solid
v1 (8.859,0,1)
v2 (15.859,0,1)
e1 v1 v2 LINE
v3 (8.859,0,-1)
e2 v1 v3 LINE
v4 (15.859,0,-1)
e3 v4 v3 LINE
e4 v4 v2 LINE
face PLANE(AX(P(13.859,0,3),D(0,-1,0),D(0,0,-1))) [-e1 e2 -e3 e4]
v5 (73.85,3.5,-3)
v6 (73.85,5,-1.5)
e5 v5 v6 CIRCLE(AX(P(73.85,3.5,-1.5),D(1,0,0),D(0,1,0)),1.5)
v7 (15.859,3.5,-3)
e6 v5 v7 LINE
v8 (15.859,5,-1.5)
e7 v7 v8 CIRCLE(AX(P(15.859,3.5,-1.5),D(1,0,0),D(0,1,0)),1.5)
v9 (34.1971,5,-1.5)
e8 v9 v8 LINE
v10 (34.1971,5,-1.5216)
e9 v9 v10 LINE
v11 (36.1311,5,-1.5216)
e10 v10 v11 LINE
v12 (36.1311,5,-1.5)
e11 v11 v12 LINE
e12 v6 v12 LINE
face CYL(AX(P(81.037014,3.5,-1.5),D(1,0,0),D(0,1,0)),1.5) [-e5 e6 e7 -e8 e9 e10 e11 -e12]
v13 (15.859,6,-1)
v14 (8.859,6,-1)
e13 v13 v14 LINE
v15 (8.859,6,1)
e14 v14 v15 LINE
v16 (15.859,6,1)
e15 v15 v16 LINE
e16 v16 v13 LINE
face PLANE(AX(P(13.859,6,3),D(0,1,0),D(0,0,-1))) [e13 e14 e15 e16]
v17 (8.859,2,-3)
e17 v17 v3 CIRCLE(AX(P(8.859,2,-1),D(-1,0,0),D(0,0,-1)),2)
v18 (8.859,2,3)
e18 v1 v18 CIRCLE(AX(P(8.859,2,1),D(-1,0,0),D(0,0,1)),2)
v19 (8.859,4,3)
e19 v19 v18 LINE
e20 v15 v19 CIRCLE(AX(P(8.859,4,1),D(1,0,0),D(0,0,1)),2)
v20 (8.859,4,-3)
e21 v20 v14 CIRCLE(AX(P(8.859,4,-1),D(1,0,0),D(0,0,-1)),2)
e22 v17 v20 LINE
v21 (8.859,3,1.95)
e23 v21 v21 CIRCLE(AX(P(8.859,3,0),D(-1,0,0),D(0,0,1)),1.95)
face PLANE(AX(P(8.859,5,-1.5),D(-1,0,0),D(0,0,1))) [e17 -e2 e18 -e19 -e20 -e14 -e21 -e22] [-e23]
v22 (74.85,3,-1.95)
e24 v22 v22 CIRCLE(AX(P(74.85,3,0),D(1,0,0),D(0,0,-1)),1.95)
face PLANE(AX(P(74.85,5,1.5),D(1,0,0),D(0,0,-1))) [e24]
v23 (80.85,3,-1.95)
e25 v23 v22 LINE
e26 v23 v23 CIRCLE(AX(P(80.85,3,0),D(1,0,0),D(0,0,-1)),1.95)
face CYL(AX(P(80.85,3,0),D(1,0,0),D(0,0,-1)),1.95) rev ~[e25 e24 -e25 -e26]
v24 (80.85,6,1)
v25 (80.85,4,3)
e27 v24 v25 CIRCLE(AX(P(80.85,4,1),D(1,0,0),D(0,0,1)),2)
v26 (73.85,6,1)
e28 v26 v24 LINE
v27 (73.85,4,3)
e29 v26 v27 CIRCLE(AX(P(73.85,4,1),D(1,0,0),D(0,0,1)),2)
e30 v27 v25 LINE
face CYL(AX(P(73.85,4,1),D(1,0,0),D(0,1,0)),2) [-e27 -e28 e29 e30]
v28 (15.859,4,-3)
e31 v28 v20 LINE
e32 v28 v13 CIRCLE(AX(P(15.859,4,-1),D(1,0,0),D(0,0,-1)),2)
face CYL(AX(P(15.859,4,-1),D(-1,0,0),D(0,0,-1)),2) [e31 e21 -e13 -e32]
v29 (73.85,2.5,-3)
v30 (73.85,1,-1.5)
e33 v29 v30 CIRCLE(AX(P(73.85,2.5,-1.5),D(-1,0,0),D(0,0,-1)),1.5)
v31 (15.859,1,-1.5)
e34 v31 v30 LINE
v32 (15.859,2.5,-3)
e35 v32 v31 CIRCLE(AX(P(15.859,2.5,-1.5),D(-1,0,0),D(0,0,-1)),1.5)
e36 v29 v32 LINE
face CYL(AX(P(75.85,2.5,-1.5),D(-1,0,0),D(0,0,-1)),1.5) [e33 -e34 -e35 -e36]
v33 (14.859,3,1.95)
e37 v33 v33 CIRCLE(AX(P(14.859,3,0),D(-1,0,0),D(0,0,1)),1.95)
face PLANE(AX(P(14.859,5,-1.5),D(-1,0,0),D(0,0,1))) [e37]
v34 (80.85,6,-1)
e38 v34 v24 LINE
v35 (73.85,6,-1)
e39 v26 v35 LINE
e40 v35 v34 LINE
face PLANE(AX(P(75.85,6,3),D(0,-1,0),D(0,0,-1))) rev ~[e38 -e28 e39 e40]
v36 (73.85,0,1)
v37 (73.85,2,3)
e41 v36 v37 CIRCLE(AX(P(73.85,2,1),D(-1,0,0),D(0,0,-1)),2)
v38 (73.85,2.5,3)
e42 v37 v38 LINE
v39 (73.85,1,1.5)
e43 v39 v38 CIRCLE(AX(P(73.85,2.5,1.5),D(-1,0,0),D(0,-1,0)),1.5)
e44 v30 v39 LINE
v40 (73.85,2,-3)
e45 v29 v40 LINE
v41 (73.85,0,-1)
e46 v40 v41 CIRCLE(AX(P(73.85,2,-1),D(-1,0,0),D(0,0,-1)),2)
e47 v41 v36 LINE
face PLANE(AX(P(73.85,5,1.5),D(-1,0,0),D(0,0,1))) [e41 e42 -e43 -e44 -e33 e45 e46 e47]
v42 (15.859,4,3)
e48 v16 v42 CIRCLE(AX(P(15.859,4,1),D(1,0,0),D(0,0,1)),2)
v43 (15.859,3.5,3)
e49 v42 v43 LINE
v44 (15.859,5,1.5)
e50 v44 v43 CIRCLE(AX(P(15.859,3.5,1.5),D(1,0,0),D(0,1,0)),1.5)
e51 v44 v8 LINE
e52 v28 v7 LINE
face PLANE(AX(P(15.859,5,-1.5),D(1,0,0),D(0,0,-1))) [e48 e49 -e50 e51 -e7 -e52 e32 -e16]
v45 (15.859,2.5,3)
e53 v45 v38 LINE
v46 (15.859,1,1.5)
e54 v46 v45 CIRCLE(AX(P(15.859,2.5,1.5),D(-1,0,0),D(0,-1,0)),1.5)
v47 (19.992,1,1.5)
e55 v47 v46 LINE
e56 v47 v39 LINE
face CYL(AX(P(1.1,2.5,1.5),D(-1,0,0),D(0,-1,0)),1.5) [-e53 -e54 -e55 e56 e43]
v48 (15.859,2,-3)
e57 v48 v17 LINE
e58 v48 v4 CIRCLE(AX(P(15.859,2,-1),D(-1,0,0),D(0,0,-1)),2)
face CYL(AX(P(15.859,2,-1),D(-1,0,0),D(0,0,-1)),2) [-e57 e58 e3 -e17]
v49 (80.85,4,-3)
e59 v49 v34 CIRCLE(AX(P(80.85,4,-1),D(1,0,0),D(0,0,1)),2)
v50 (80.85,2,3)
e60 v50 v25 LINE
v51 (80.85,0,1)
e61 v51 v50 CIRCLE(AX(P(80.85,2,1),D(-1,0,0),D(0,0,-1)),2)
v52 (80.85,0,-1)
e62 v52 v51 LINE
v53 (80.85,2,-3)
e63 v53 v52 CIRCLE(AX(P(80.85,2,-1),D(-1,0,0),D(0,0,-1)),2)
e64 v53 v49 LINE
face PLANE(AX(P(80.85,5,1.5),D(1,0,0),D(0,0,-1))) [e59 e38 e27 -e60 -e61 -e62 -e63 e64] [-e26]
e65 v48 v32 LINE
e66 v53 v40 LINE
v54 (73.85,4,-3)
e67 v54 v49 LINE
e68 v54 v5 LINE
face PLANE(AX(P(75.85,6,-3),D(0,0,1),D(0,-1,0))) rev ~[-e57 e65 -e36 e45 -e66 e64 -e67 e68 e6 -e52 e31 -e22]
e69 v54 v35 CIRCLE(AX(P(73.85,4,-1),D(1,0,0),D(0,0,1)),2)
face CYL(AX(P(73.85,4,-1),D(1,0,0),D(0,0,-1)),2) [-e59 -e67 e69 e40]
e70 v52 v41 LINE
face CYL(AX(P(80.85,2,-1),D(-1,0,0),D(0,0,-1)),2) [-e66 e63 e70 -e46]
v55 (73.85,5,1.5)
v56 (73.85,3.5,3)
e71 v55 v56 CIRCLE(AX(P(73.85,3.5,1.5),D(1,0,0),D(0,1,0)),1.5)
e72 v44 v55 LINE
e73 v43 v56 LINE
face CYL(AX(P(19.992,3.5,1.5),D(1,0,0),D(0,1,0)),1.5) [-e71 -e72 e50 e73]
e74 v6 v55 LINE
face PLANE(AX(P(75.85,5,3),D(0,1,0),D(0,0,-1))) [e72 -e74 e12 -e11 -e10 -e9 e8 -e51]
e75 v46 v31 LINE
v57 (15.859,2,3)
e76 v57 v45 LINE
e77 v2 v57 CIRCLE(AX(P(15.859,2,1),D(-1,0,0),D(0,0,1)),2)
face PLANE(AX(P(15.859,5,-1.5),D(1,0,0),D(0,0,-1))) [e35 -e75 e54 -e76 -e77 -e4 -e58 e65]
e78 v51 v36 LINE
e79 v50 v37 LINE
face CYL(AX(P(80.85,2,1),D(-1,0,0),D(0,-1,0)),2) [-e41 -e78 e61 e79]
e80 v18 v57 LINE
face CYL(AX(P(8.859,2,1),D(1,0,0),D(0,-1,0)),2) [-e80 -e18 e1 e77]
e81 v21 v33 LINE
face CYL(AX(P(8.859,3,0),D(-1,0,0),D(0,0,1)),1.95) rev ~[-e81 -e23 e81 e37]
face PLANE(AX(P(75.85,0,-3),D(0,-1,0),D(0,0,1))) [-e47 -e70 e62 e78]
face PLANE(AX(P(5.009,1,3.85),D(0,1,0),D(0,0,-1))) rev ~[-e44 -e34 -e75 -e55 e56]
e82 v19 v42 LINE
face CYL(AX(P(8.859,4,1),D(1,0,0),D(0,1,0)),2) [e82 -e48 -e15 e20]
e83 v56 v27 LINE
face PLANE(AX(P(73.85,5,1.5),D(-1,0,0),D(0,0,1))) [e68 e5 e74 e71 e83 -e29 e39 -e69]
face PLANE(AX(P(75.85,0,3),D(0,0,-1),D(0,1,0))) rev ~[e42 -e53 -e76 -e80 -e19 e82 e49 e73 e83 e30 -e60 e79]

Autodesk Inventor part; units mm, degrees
ref_plane "YZ Plane" through (0, 0, 0) normal (1, 0, 0) x (0, 1, 0)
ref_plane "XZ Plane" through (0, 0, 0) normal (0, 1, 0) x (-1, 0, 0)
ref_plane "XY Plane" through (0, 0, 0) normal (0, 0, 1) x (1, 0, 0)
sketch "Sketch1" plane through (0, 0, 0) normal (0, 1, 0) x (-1, 0, 0)
  point P0 (0, 0)
sketch "Sketch2" plane through (0, 0, 0) normal (0, 1, 0) x (-1, 0, 0)
  circle A0 centre (0, 0) radius 3.85
  dimension "d0" = 7.7
extrude "Extrusion1" add sketch "Sketch2" along normal blind 6
sketch "Sketch3" plane through (0, 6, 0) normal (0, 1, 0) x (1, 0, 0)
  circle A0 centre (0, 0) radius 1
  dimension "d3" = 2
extrude "Extrusion2" cut sketch "Sketch3" against normal through all
sketch "Sketch4" plane through (0, 0, 0) normal (0, -1, 0) x (1, 0, 0)
  circle A0 centre (0, 0) radius 3.85 projected
  line L0 (0, 3.85) -> (3.85, 3.85)
  line L1 (3.85, 3.85) -> (3.85, -3.85)
  line L2 (3.85, -3.85) -> (0, -3.85)
  line L3 (3.85, 3.85) -> (4.85, 3.85)
  line L4 (4.85, 3.85) -> (4.85, -3.85)
  line L5 (4.85, -3.85) -> (3.85, -3.85)
  line L6 (3.85, -3.85) -> (3.85, 3.85)
  line L7 (4.85, 3.85) -> (4.85, 3)
  line L8 (4.85, -3.85) -> (4.85, -3)
  line L9 (4.85, 3) -> (3.85, 3)
  line L10 (3.85, 3) -> (3.85, -3)
  line L11 (3.85, -3) -> (4.85, -3)
  line L12 (4.85, -3) -> (4.85, 3)
  point P0 (3.85, -3)
  dimension "d6" = 1
  dimension "d7" = 0.85
  dimension "d8" = 0.85
extrude "Extrusion3" add sketch "Sketch4" against normal blind 6 contours L1 L9 L4 L11
sketch "Sketch5" plane through (4.85, 0, 3) normal (1, 0, 0) x (0, 0, -1)
  line L0 (6.85, 0) -> (-0.85, 0) projected
  line L1 (6, 0) -> (6, 6) projected
  line L2 (0.0003, 0) -> (6, 0)
  line L3 (6, 0) -> (6, 1)
  line L4 (6, 1) -> (0.0003, 1)
  line L5 (0.0003, 1) -> (0.0003, 0)
  line L6 (6.85, 6) -> (-0.85, 6) projected
  line L7 (0.0003, 6) -> (6, 6)
  line L8 (6, 6) -> (6, 5)
  line L9 (6, 5) -> (0.0003, 5)
  line L10 (0.0003, 5) -> (0.0003, 6)
  point P0 (3, 0)
  point P1 (3, 6)
  dimension "d11" = 1
  dimension "d12" = 1
extrude "Extrusion4" cut sketch "Sketch5" against normal blind 1 contours L9 L10 L6 L1
extrude "Extrusion5" cut sketch "Sketch5" against normal blind 1 contours L0 L5 L4 L1
sketch "Sketch6" plane through (4.85, 5, 2.9997) normal (0, 0, -1) x (-1, 0, 0)
  line L0 (0, 0) -> (1, 0) projected
  line L1 (0, -5) -> (0, 1) projected
  line L2 (1, 0) -> (0, 0)
  line L3 (0, 0) -> (0, 1)
  line L4 (0, 1) -> (1, 1)
  line L5 (1, 1) -> (1, 0)
  line L6 (1, -5) -> (0, -5)
  line L7 (0, -5) -> (0, -3.9916)
  line L8 (0, -3.9916) -> (1, -3.9916)
  line L9 (1, -3.9916) -> (1, -5)
  point P0 (4.85, -5)
extrude "Extrusion6" cut sketch "Sketch6" against normal through all contours L1 L4 L5 L0
extrude "Extrusion7" cut sketch "Sketch6" against normal through all contours L1 L8 L9 L6
sketch "Sketch7" plane through (4.85, 5, 3) normal (1, 0, 0) x (0, 0, -1)
  line L0 (0, 0) -> (3, 0) projected
  line L1 (6, -4) -> (6, 0) projected
  line L2 (0, 0) -> (6, 0)
  line L3 (6, 0) -> (6, -4)
  line L4 (6, -4) -> (0, -4)
  line L5 (0, -4) -> (0, 0)
  point P0 (3, -5)
extrude "Extrusion8" add sketch "Sketch7" along normal blind 71
sketch "Sketch8" plane through (3.85, 1, -3) normal (0, 0, -1) x (-1, 0, 0)
  point P0 (3.85, -1)
sketch "Sketch9" plane through (3.85, 5, 0) normal (0, 1, 0) x (1, 0, 0)
  line L0 (72, 3) -> (72, -3) projected
  line L1 (72, 0) -> (75.85, 0)
  circle A0 centre (75.85, 0) radius 3.85
  point P0 (-3.85, 0)
  dimension "d23" = 3.85
extrude "Extrusion9" add sketch "Sketch9" along normal blind 1
extrude "Extrusion10" add sketch "Sketch9" against normal blind 5
sketch "Sketch10" plane through (79.7, 6, 0) normal (0, 1, 0) x (1, 0, 0)
  circle A0 centre (0, 0) radius 1.85
  point P0 (-79.7, 0)
  dimension "d28" = 3.7
extrude "Extrusion11" cut sketch "Sketch10" against normal through all
sketch "Sketch11" plane through (3.85, 5, 0) normal (-1, 0, 0) x (0, 0, 1)
  point P0 (0, -5)
sketch "Sketch12" plane through (3.85, 5, -3) normal (-1, 0, 0) x (0, 0, 1)
  line L0 (0, 0) -> (3, 0) projected
  line L1 (6, 0) -> (6, -4) projected
  line L2 (0, 0) -> (6, 0)
  line L3 (6, 0) -> (6, -4)
  line L4 (6, -4) -> (0, -4)
  line L5 (0, -4) -> (0, 0)
  point P0 (3, -5)
extrude "Extrusion12" add sketch "Sketch12" along normal blind 2
sketch "Sketch13" plane through (75.85, 5, 3) normal (1, 0, 0) x (0, 0, -1)
  line L0 (3, 0) -> (0, 0) projected
  line L1 (3, -4) -> (6, -4) projected
  line L2 (0, 0) -> (6, 0)
  line L3 (6, 0) -> (6, -4)
  line L4 (6, -4) -> (0, -4)
  line L5 (0, -4) -> (0, 0)
  point P0 (3, -5)
extrude "Extrusion13" add sketch "Sketch13" along normal blind 1.6
fillet "Fillet1" radius 1.5 2 edges at (76.5685, 5, 3) (39.1315, 5, 3)
fillet "Fillet2" radius 1.5 1 edges at (39.85, 5, -3)
fillet "Fillet3" radius 1.5 1 edges at (39.85, 1, -3)
fillet "Fillet4" radius 1.5 3 edges at (4.35, 1, 2.9997) (40.35, 1, 3) (4.85, 1, 2.9998)
sketch "Sketch14" plane through (3.5458, 5, 1.5) normal (0, 1, 0) x (1, 0, 0)
  point P0 (-3.5458, 1.5)
sketch "Sketch15" plane through (3.5458, 5, 1.5) normal (0, 1, 0) x (1, 0, 0)
  line L0 (0.4177, 2.9988) -> (2.9717, 2.9988) construction
  line L1 (2.9717, 2.9988) -> (2.9717, -0.0492) construction
  line L2 (2.9717, -0.0492) -> (0.4177, -0.0492) construction
  line L3 (0.4177, -0.0492) -> (0.4177, 2.9988) construction
  line L4 (0.398, -0.0492) -> (1.4255, 2.9988)
  line L5 (1.4255, 2.9988) -> (1.9244, 2.9988)
  line L6 (1.9244, 2.9988) -> (2.952, -0.0492)
  line L7 (2.952, -0.0492) -> (2.5247, -0.0492)
  line L8 (2.5247, -0.0492) -> (2.248, 0.803)
  line L9 (2.248, 0.803) -> (1.0846, 0.803)
  line L10 (1.0846, 0.803) -> (0.808, -0.0492)
  line L11 (0.808, -0.0492) -> (0.398, -0.0492)
  line L12 (2.1369, 1.1488) -> (1.6651, 2.5839)
  line L13 (1.6651, 2.5839) -> (1.1958, 1.1488)
  line L14 (1.1958, 1.1488) -> (2.1369, 1.1488)
  point P0 (-3.5458, 1.5)
extrude "Extrusion14" add sketch "Sketch15" along normal blind 0.2
sketch "Sketch16" plane through (3.5458, 5, -1.5) normal (0, 1, 0) x (1, 0, 0)
  line L0 (69.8363, -0.0038) -> (72.3064, -0.0038) construction
  line L1 (72.3064, -0.0038) -> (72.3064, -3.0518) construction
  line L2 (72.3064, -3.0518) -> (69.8363, -3.0518) construction
  line L3 (69.8363, -3.0518) -> (69.8363, -0.0038) construction
  spline S0 degree 2 poles (72.2125, -2.1157) (72.2125, -2.3429) (72.0396, -2.6912) (71.8963, -2.8048) knots 0 0 0 1 2 2 2
  spline S1 degree 2 poles (71.8963, -2.8048) (71.7234, -2.9382) (71.3307, -3.0518) (71.0195, -3.0518) knots 0 0 0 1 2 2 2
  line L4 (71.0195, -3.0518) -> (70.1451, -3.0518)
  line L5 (70.1451, -3.0518) -> (70.1451, -0.0038)
  line L6 (70.1451, -0.0038) -> (70.9528, -0.0038)
  spline S2 degree 2 poles (70.9528, -0.0038) (71.2788, -0.0038) (71.6049, -0.0458) (71.7531, -0.1273) knots 0 0 0 1 2 2 2
  spline S3 degree 2 poles (71.7531, -0.1273) (71.9186, -0.2138) (72.0692, -0.4978) (72.0692, -0.6905) knots 0 0 0 1 2 2 2
  spline S4 degree 2 poles (72.0692, -0.6905) (72.0692, -0.9054) (71.842, -1.2462) (71.6419, -1.3426) knots 0 0 0 1 2 2 2
  line L7 (71.6419, -1.3426) -> (71.6419, -1.3574)
  spline S5 degree 2 poles (71.6419, -1.3574) (71.9136, -1.4315) (72.2125, -1.8242) (72.2125, -2.1157) knots 0 0 0 1 2 2 2
  spline S6 degree 2 poles (71.7901, -2.133) (71.7901, -1.9601) (71.6913, -1.7378) (71.5431, -1.6587) knots 0 0 0 1 2 2 2
  spline S7 degree 2 poles (71.5431, -1.6587) (71.4468, -1.6093) (71.2195, -1.5797) (71.0096, -1.5797) knots 0 0 0 1 2 2 2
  line L8 (71.0096, -1.5797) -> (70.5502, -1.5797)
  line L9 (70.5502, -1.5797) -> (70.5502, -2.706)
  line L10 (70.5502, -2.706) -> (70.8787, -2.706)
  spline S8 degree 2 poles (70.8787, -2.706) (71.1454, -2.706) (71.4517, -2.6566) (71.5703, -2.5776) knots 0 0 0 1 2 2 2
  spline S9 degree 2 poles (71.5703, -2.5776) (71.6839, -2.4961) (71.7901, -2.2935) (71.7901, -2.133) knots 0 0 0 1 2 2 2
  spline S10 degree 2 poles (71.6469, -0.7473) (71.6469, -0.6386) (71.5728, -0.4756) (71.4912, -0.4287) knots 0 0 0 1 2 2 2
  spline S11 degree 2 poles (71.4912, -0.4287) (71.3924, -0.3743) (71.1529, -0.3496) (70.938, -0.3496) knots 0 0 0 1 2 2 2
  line L11 (70.938, -0.3496) -> (70.5502, -0.3496)
  line L12 (70.5502, -0.3496) -> (70.5502, -1.2413)
  line L13 (70.5502, -1.2413) -> (71.0096, -1.2413)
  spline S12 degree 2 poles (71.0096, -1.2413) (71.1998, -1.2413) (71.3801, -1.2018) (71.4764, -1.14) knots 0 0 0 1 2 2 2
  spline S13 degree 2 poles (71.4764, -1.14) (71.5703, -1.0807) (71.6469, -0.8905) (71.6469, -0.7473) knots 0 0 0 1 2 2 2
  point P0 (-3.5458, -1.5)
extrude "Extrusion15" add sketch "Sketch16" along normal blind 0.2
sketch "Sketch17" plane through (3.5458, 5, -1.5) normal (0, 1, 0) x (1, 0, 0)
  line L0 (0.4145, -1.5) -> (36.4145, -1.5)
  line L1 (30.4487, 0.0859) -> (55.6072, 0.0859) construction
  line L2 (55.6072, 0.0859) -> (55.6072, -2.5363) construction
  line L3 (55.6072, -2.5363) -> (30.4487, -2.5363) construction
  line L4 (30.4487, -2.5363) -> (30.4487, 0.0859) construction
  line L5 (32.5853, -0.4353) -> (31.2663, -3.0264)
  line L6 (31.2663, -3.0264) -> (30.8316, -3.0264)
  line L7 (30.8316, -3.0264) -> (32.2247, -0.3365)
  line L8 (32.2247, -0.3365) -> (30.6513, -0.3365)
  line L9 (30.6513, -0.3365) -> (30.6513, 0.0216)
  line L10 (30.6513, 0.0216) -> (32.5853, 0.0216)
  line L11 (32.5853, 0.0216) -> (32.5853, -0.4353)
  line L12 (34.838, -3.0264) -> (32.9583, -3.0264)
  line L13 (32.9583, -3.0264) -> (32.9583, -2.5941)
  spline S0 degree 2 poles (32.9583, -2.5941) (33.1608, -2.4039) (33.5214, -2.0507) (33.6943, -1.8605) knots 0 0 0 1 2 2 2
  spline S1 degree 2 poles (33.6943, -1.8605) (34.0426, -1.4777) (34.297, -1.0182) (34.297, -0.7737) knots 0 0 0 1 2 2 2
  spline S2 degree 2 poles (34.297, -0.7737) (34.297, -0.6453) (34.218, -0.4526) (34.1464, -0.3909) knots 0 0 0 1 2 2 2
  spline S3 degree 2 poles (34.1464, -0.3909) (34.0747, -0.3291) (33.887, -0.2674) (33.7734, -0.2674) knots 0 0 0 1 2 2 2
  spline S4 degree 2 poles (33.7734, -0.2674) (33.6647, -0.2674) (33.4424, -0.3217) (33.3411, -0.3637) knots 0 0 0 1 2 2 2
  spline S5 degree 2 poles (33.3411, -0.3637) (33.2547, -0.3983) (33.0941, -0.4971) (33.0447, -0.5317) knots 0 0 0 1 2 2 2
  line L14 (33.0447, -0.5317) -> (33.0225, -0.5317)
  line L15 (33.0225, -0.5317) -> (33.0225, -0.0969)
  spline S6 degree 2 poles (33.0225, -0.0969) (33.1485, -0.0352) (33.6005, 0.0859) (33.803, 0.0859) knots 0 0 0 1 2 2 2
  spline S7 degree 2 poles (33.803, 0.0859) (34.2303, 0.0859) (34.712, -0.3662) (34.712, -0.7515) knots 0 0 0 1 2 2 2
  spline S8 degree 2 poles (34.712, -0.7515) (34.712, -0.9318) (34.628, -1.2331) (34.5539, -1.3616) knots 0 0 0 1 2 2 2
  spline S9 degree 2 poles (34.5539, -1.3616) (34.4798, -1.495) (34.2649, -1.7568) (34.1464, -1.8828) knots 0 0 0 1 2 2 2
  spline S10 degree 2 poles (34.1464, -1.8828) (33.9537, -2.0927) (33.4819, -2.5422) (33.3411, -2.6732) knots 0 0 0 1 2 2 2
  line L16 (33.3411, -2.6732) -> (34.838, -2.6732)
  line L17 (34.838, -2.6732) -> (34.838, -3.0264)
  line L18 (37.8958, -3.0264) -> (37.8958, -1.7024)
  spline S11 degree 2 poles (37.8958, -1.7024) (37.8958, -1.5444) (37.8711, -1.2751) (37.8316, -1.201) knots 0 0 0 1 2 2 2
  spline S12 degree 2 poles (37.8316, -1.201) (37.7921, -1.1195) (37.6414, -1.0405) (37.5105, -1.0405) knots 0 0 0 1 2 2 2
  spline S13 degree 2 poles (37.5105, -1.0405) (37.392, -1.0405) (37.1203, -1.1862) (36.977, -1.3245) knots 0 0 0 1 2 2 2
  spline S14 degree 2 poles (36.977, -1.3245) (36.9795, -1.3591) (36.9844, -1.4554) (36.9844, -1.5197) knots 0 0 0 1 2 2 2
  line L19 (36.9844, -1.5197) -> (36.9844, -3.0264)
  line L20 (36.9844, -3.0264) -> (36.5991, -3.0264)
  line L21 (36.5991, -3.0264) -> (36.5991, -1.7024)
  spline S15 degree 2 poles (36.5991, -1.7024) (36.5991, -1.5444) (36.5744, -1.2751) (36.5349, -1.201) knots 0 0 0 1 2 2 2
  spline S16 degree 2 poles (36.5349, -1.201) (36.4953, -1.1195) (36.3447, -1.0405) (36.2138, -1.0405) knots 0 0 0 1 2 2 2
  spline S17 degree 2 poles (36.2138, -1.0405) (36.0903, -1.0405) (35.8161, -1.1961) (35.6876, -1.3171) knots 0 0 0 1 2 2 2
  line L22 (35.6876, -1.3171) -> (35.6876, -3.0264)
  line L23 (35.6876, -3.0264) -> (35.3023, -3.0264)
  line L24 (35.3023, -3.0264) -> (35.3023, -0.7391)
  line L25 (35.3023, -0.7391) -> (35.6876, -0.7391)
  line L26 (35.6876, -0.7391) -> (35.6876, -0.9911)
  spline S18 degree 2 poles (35.6876, -0.9911) (35.8383, -0.8404) (36.1347, -0.6749) (36.3126, -0.6749) knots 0 0 0 1 2 2 2
  spline S19 degree 2 poles (36.3126, -0.6749) (36.5151, -0.6749) (36.8288, -0.8602) (36.9103, -1.0701) knots 0 0 0 1 2 2 2
  spline S20 degree 2 poles (36.9103, -1.0701) (37.0857, -0.875) (37.4167, -0.6749) (37.6093, -0.6749) knots 0 0 0 1 2 2 2
  spline S21 degree 2 poles (37.6093, -0.6749) (37.7575, -0.6749) (37.9996, -0.7663) (38.0885, -0.87) knots 0 0 0 1 2 2 2
  spline S22 degree 2 poles (38.0885, -0.87) (38.1799, -0.9738) (38.2812, -1.285) (38.2812, -1.5197) knots 0 0 0 1 2 2 2
  line L27 (38.2812, -1.5197) -> (38.2812, -3.0264)
  line L28 (38.2812, -3.0264) -> (37.8958, -3.0264)
  line L29 (41.4156, -3.0264) -> (41.4156, -1.7024)
  spline S23 degree 2 poles (41.4156, -1.7024) (41.4156, -1.5444) (41.3909, -1.2751) (41.3514, -1.201) knots 0 0 0 1 2 2 2
  spline S24 degree 2 poles (41.3514, -1.201) (41.3119, -1.1195) (41.1612, -1.0405) (41.0303, -1.0405) knots 0 0 0 1 2 2 2
  spline S25 degree 2 poles (41.0303, -1.0405) (40.9117, -1.0405) (40.64, -1.1862) (40.4968, -1.3245) knots 0 0 0 1 2 2 2
  spline S26 degree 2 poles (40.4968, -1.3245) (40.4992, -1.3591) (40.5042, -1.4554) (40.5042, -1.5197) knots 0 0 0 1 2 2 2
  line L30 (40.5042, -1.5197) -> (40.5042, -3.0264)
  line L31 (40.5042, -3.0264) -> (40.1189, -3.0264)
  line L32 (40.1189, -3.0264) -> (40.1189, -1.7024)
  spline S27 degree 2 poles (40.1189, -1.7024) (40.1189, -1.5444) (40.0942, -1.2751) (40.0546, -1.201) knots 0 0 0 1 2 2 2
  spline S28 degree 2 poles (40.0546, -1.201) (40.0151, -1.1195) (39.8644, -1.0405) (39.7335, -1.0405) knots 0 0 0 1 2 2 2
  spline S29 degree 2 poles (39.7335, -1.0405) (39.61, -1.0405) (39.3359, -1.1961) (39.2074, -1.3171) knots 0 0 0 1 2 2 2
  line L33 (39.2074, -1.3171) -> (39.2074, -3.0264)
  line L34 (39.2074, -3.0264) -> (38.8221, -3.0264)
  line L35 (38.8221, -3.0264) -> (38.8221, -0.7391)
  line L36 (38.8221, -0.7391) -> (39.2074, -0.7391)
  line L37 (39.2074, -0.7391) -> (39.2074, -0.9911)
  spline S30 degree 2 poles (39.2074, -0.9911) (39.3581, -0.8404) (39.6545, -0.6749) (39.8323, -0.6749) knots 0 0 0 1 2 2 2
  spline S31 degree 2 poles (39.8323, -0.6749) (40.0349, -0.6749) (40.3486, -0.8602) (40.4301, -1.0701) knots 0 0 0 1 2 2 2
  spline S32 degree 2 poles (40.4301, -1.0701) (40.6054, -0.875) (40.9364, -0.6749) (41.1291, -0.6749) knots 0 0 0 1 2 2 2
  spline S33 degree 2 poles (41.1291, -0.6749) (41.2773, -0.6749) (41.5194, -0.7663) (41.6083, -0.87) knots 0 0 0 1 2 2 2
  spline S34 degree 2 poles (41.6083, -0.87) (41.6997, -0.9738) (41.8009, -1.285) (41.8009, -1.5197) knots 0 0 0 1 2 2 2
  line L38 (41.8009, -1.5197) -> (41.8009, -3.0264)
  line L39 (41.8009, -3.0264) -> (41.4156, -3.0264)
  point P0 (-3.5458, -1.5)
  dimension "d43" = 36
extrude "Extrusion16" add sketch "Sketch17" along normal blind 0.2
sketch "Sketch18" plane through (3.5458, 5.2, -1.5) normal (0, 1, 0) x (1, 0, 0)
  line L0 (29.8828, 2.0952) -> (43.3392, 2.0952)
  line L1 (43.3392, 2.0952) -> (43.3392, -5.5663)
  line L2 (43.3392, -5.5663) -> (29.8828, -5.5663)
  line L3 (29.8828, -5.5663) -> (29.8828, 2.0952)
  point P0 (-3.5458, -1.5)
extrude "Extrusion17" cut sketch "Sketch18" against normal blind 0.2
sketch "Sketch19" plane through (3.5458, 5.2, 1.5) normal (0, 1, 0) x (1, 0, 0)
  line L0 (0.3624, -0.1736) -> (3.3783, -0.1736)
  line L1 (3.3783, -0.1736) -> (3.3783, 3.2897)
  line L2 (3.3783, 3.2897) -> (0.3624, 3.2897)
  line L3 (0.3624, 3.2897) -> (0.3624, -0.1736)
  line L4 (72.2697, -0.5369) -> (69.8008, -0.5369)
  line L5 (69.8008, -0.5369) -> (69.8008, 3.7021)
  line L6 (69.8008, 3.7021) -> (72.2697, 3.7021)
  line L7 (72.2697, 3.7021) -> (72.2697, -0.5369)
  point P0 (-3.5458, 1.5)
extrude "Extrusion18" cut sketch "Sketch19" against normal blind 0.2 contours L3 L2 L1 L0
extrude "Extrusion19" cut sketch "Sketch19" against normal blind 0.2 contours L4 L5 L6 L7
sketch "Sketch20" plane through (79.7, 0, 0) normal (0, -1, 0) x (1, 0, 0)
  point P0 (-79.7, 0)
sketch "Sketch21" plane through (79.7, 6, 0) normal (0, 1, 0) x (1, 0, 0)
  circle A0 centre (0, 0) radius 1.95
  point P0 (-79.7, 0)
  dimension "d52" = 3.9
extrude "Extrusion20" cut sketch "Sketch21" against normal through all
sketch "Sketch22" plane through (0, 6, 0) normal (0, 1, 0) x (1, 0, 0)
  line L0 (0, 0) -> (0, -3.85)
  circle A0 centre (0, 0) radius 3.85 projected
  line L1 (0, -3.85) -> (3.85, -3.85)
  line L2 (3.85, -3.85) -> (-3.85, -3.85)
  line L3 (-3.85, -3.85) -> (-3.85, 3.85)
  line L4 (-3.85, 3.85) -> (3.85, 3.85)
  line L5 (3.85, 3.85) -> (3.85, -3.85)
extrude "Extrusion21" cut sketch "Sketch22" against normal through all contours A0
sketch "Sketch23" plane through (79.7, 5, 0) normal (0, 1, 0) x (1, 0, 0)
  arc A0 (-76.1542, -1.5) -> (-76.1542, 1.5) centre (-79.7, 0) ccw projected
  line L0 (-75.85, 0) -> (-77.9753, 0)
  line L1 (-77.9753, 0) -> (-77.9753, 3.5992)
  line L2 (-77.9753, 3.5992) -> (-75.85, 3.5992)
  line L3 (-75.85, 3.5992) -> (-75.85, 0)
  line L4 (-75.85, 0) -> (-77.9753, 0)
  line L5 (-77.9753, 0) -> (-77.9753, -3.4561)
  line L6 (-77.9753, -3.4561) -> (-75.85, -3.4561)
  line L7 (-75.85, -3.4561) -> (-75.85, 0)
  line L8 (-75.85, -3.4561) -> (-65.85, -3.4561)
  line L9 (-65.85, -3.4561) -> (-65.85, 3.5992)
  line L10 (-65.85, 3.5992) -> (-75.85, 3.5992)
  line L11 (-75.85, 3.5992) -> (-75.85, -3.4561)
  dimension "d57" = 10
extrude "Extrusion22" cut sketch "Sketch23" against normal through all contours L3 L10 L9 L8 L7
extrude "Extrusion23" cut sketch "Sketch23" against normal through all contours L7 L6 L5 L0
extrude "Extrusion24" cut sketch "Sketch23" against normal through all contours L0 L1 L2 L3
sketch "Sketch24" plane through (13.85, 5, -1.5) normal (-1, 0, 0) x (0, 0, 1)
  line L0 (-2.9013, -5) -> (5.7799, -5)
  line L1 (5.7799, -5) -> (5.7799, 1.344)
  line L2 (5.7799, 1.344) -> (-2.9013, 1.344)
  line L3 (-2.9013, 1.344) -> (-2.9013, -5)
  point P0 (1.5, -5)
extrude "Extrusion25" cut sketch "Sketch24" against normal blind 6.142
sketch "Sketch25" plane through (19.992, 5, -1.5) normal (-1, 0, 0) x (0, 0, 1)
  line L0 (-1.5, 0) -> (4.5, 0)
  line L1 (4.5, 0) -> (4.5, -4)
  line L2 (4.5, -4) -> (-1.5, -4)
  line L3 (-1.5, -4) -> (-1.5, 0)
  point P0 (1.5, -5)
  dimension "d66" = 6
  dimension "d67" = 4
extrude "Extrusion26" add sketch "Sketch25" along normal blind 6.133
sketch "Sketch26" plane through (79.7, 6, 0) normal (0, 1, 0) x (1, 0, 0)
  line L0 (-65.841, -3) -> (-65.841, 3) projected
  line L1 (-65.841, 0) -> (-69.691, 0)
  circle A0 centre (-69.691, 0) radius 3.85
  point P0 (-79.7, 0)
  dimension "d70" = 3.85
extrude "Extrusion27" add sketch "Sketch26" against normal blind 6
sketch "Sketch27" plane through (13.859, 5, -1.5) normal (-1, 0, 0) x (0, 0, 1)
  point P0 (1.5, -5)
sketch "Sketch28" plane through (13.859, 5, -1.5) normal (-1, 0, 0) x (0, 0, 1)
  line L0 (-1.5, 0) -> (-1.5, -4) projected
  line L1 (4.5, 0) -> (3, 0) projected
  line L2 (-1.5, -4) -> (4.5, -4)
  line L3 (4.5, -4) -> (4.5, 0)
  line L4 (4.5, 0) -> (-1.5, 0)
  line L5 (-1.5, 0) -> (-1.5, -4)
  point P0 (1.5, -5)
extrude "Extrusion28" add sketch "Sketch28" along normal blind 5
sketch "Sketch29" plane through (19.992, 3.5, 3) normal (0, 0, 1) x (1, 0, 0)
  point P0 (-19.992, -3.5)
sketch "Sketch30" plane through (79.7, 5, 0) normal (0, 1, 0) x (1, 0, 0)
  point P0 (-79.7, 0)
sketch "Sketch31" plane through (19.992, 5, -1.5) normal (1, 0, 0) x (0, 0, -1)
  arc A0 (-3, 0) -> (-4.5, -1.5) centre (-3, -1.5) ccw projected
  circle A1 centre (-3, -1.5) radius 1.5
  circle A2 centre (-3, -1.5) radius 1.5
  arc A3 (-4.5, -2.5) -> (-3, -4) centre (-3, -2.5) ccw projected
  circle A4 centre (-3, -2.5) radius 1.5
  arc A5 (0, -4) -> (1.5, -2.5) centre (0, -2.5) ccw projected
  circle A6 centre (0, -2.5) radius 1.5
  arc A7 (1.5, -1.5) -> (0, 0) centre (0, -1.5) ccw projected
  circle A8 centre (0, -1.5) radius 1.5
  line L0 (-4.5, -1.5) -> (-4.5, 0) projected
  line L1 (-4.5, 0) -> (-3, 0)
  line L2 (-3, 0) -> (-3, -1.5)
  line L3 (-3, -1.5) -> (-4.5, -1.5)
  line L4 (-4.5, -1.5) -> (-4.5, 0)
  line L5 (0, 0) -> (1.5, 0)
  line L6 (1.5, 0) -> (1.5, -1.5)
  line L7 (1.5, -1.5) -> (0, -1.5)
  line L8 (0, -1.5) -> (0, 0)
  line L9 (-3, -4) -> (-4.5, -4)
  line L10 (-4.5, -4) -> (-4.5, -2.5)
  line L11 (-4.5, -2.5) -> (-3, -2.5)
  line L12 (-3, -2.5) -> (-3, -4)
  line L13 (0, -4) -> (1.5, -4)
  line L14 (1.5, -4) -> (1.5, -2.5)
  line L15 (1.5, -2.5) -> (0, -2.5)
  line L16 (0, -2.5) -> (0, -4)
  point P0 (-1.5, -5)
extrude "Extrusion29" cut sketch "Sketch31" against normal blind 10 contours A0 L0 L1
extrude "Extrusion30" cut sketch "Sketch31" against normal blind 10 contours A3 L9 L10
extrude "Extrusion31" cut sketch "Sketch31" against normal blind 10 contours A5 L14 L13
extrude "Extrusion32" cut sketch "Sketch31" against normal blind 10 contours L5 L6 A7
sketch "Sketch32" plane through (79.7, 6, 0) normal (0, 1, 0) x (1, 0, 0)
  point P0 (-79.7, 0)
sketch "Sketch33" plane through (10.009, 6, 0) normal (0, 1, 0) x (1, 0, 0)
  circle A0 centre (0, 0) radius 3.85
  point P0 (-10.009, 0)
extrude "Extrusion33" add sketch "Sketch33" against normal blind 6
sketch "Sketch34" plane through (10.009, 6, 0) normal (0, 1, 0) x (1, 0, 0)
  circle A0 centre (0, 0) radius 1.925
  point P0 (-10.009, 0)
  dimension "d85" = 3.85
extrude "Extrusion34" cut sketch "Sketch34" against normal blind 6
sketch "Sketch35" plane through (10.009, 6, 0) normal (0, 1, 0) x (1, 0, 0)
  point P0 (-10.009, 0)
sketch "Sketch36" plane through (79.7, 6, 0) normal (0, 1, 0) x (1, 0, 0)
  point P0 (-79.7, 0)
sketch "Sketch37" plane through (79.7, 6, 0) normal (0, 1, 0) x (1, 0, 0)
  point P0 (-79.7, 0)
sketch "Sketch38" plane through (10.009, 6, 0) normal (0, 1, 0) x (1, 0, 0)
  circle A0 centre (0, 0) radius 1.95
  point P0 (-10.009, 0)
  dimension "d89" = 3.9
extrude "Extrusion35" cut sketch "Sketch38" against normal blind 6
sketch "Sketch39" plane through (79.7, 6, 0) normal (0, 1, 0) x (1, 0, 0)
  point P0 (-79.7, 0)
sketch "Sketch40" plane through (79.7, 6, 0) normal (0, 1, 0) x (1, 0, 0)
  point P0 (-79.7, 0)
sketch "Sketch41" plane through (79.7, 6, 0) normal (0, 1, 0) x (1, 0, 0)
  point P0 (-79.7, 0)
sketch "Sketch42" plane through (79.7, 6, 0) normal (0, 1, 0) x (1, 0, 0)
  circle A0 centre (0, 0) radius 3
  arc A1 (-66.1452, -1.5) -> (-66.1452, 1.5) centre (-69.691, 0) ccw projected
  circle A2 centre (-69.691, 0) radius 3
  point P0 (-79.7, 0)
  dimension "d92" = 6
  dimension "d93" = 6
extrude "Extrusion36" cut sketch "Sketch42" against normal through all contours A0
extrude "Extrusion37" cut sketch "Sketch42" against normal through all contours A2
sketch "Sketch43" plane through (10.009, 0, 0) normal (0, -1, 0) x (1, 0, 0)
  circle A0 centre (0, 0) radius 3.85 projected
  line L0 (0, 3.85) -> (-5, 3.85)
  line L1 (-5, 3.85) -> (-5, -3.85)
  line L2 (-5, -3.85) -> (0, -3.85)
  line L3 (0, -3.85) -> (0, 3.85)
  line L4 (-5, 3.85) -> (-4.5, 3.85)
  line L5 (-4.5, 3.85) -> (-4.5, -3.85)
  line L6 (-4.5, -3.85) -> (-5, -3.85)
  line L7 (-5, -3.85) -> (-5, 3.85)
  point P0 (-10.009, 0)
  dimension "d98" = 5
  dimension "d99" = 0.5
extrude "Extrusion38" add sketch "Sketch43" against normal blind 1 contours L5 L2 L1 L0
sketch "Sketch44" plane through (5.009, 0, -3.85) normal (-1, 0, 0) x (0, 0, 1)
  point P0 (3.85, 0)
sketch "Sketch45" plane through (5.009, 0, -3.85) normal (-1, 0, 0) x (0, 0, 1)
  line L0 (7.7, 1) -> (0, 1) projected
  line L1 (0, 0) -> (7.7, 0) projected
  line L2 (0, 1) -> (7.7, 1)
  line L3 (7.7, 1) -> (7.7, 0)
  line L4 (7.7, 0) -> (0, 0)
  line L5 (0, 0) -> (0, 1)
  point P0 (3.85, 0)
extrude "Extrusion39" cut sketch "Sketch45" against normal through all
sketch "Sketch46" plane through (10.009, 6, 0) normal (0, 1, 0) x (1, 0, 0)
  circle A0 centre (0, 0) radius 3.85 projected
  line L0 (0, 3.85) -> (-5, 3.85)
  line L1 (-5, 3.85) -> (-5, -3.85)
  line L2 (-5, -3.85) -> (0, -3.85)
  line L3 (0, -3.85) -> (0, 3.85)
  line L4 (-5, 3.85) -> (-4.5, 3.85)
  line L5 (-4.5, 3.85) -> (-4.5, -3.85)
  line L6 (-4.5, -3.85) -> (-5, -3.85)
  line L7 (-5, -3.85) -> (-5, 3.85)
  point P0 (-10.009, 0)
  dimension "d104" = 5
  dimension "d105" = 0.5
extrude "Extrusion40" add sketch "Sketch46" against normal blind 1 contours L5 L2 L1 L0
sketch "Sketch47" plane through (5.009, 6, -3.85) normal (-1, 0, 0) x (0, 0, 1)
  line L0 (0, 0) -> (0, -1) projected
  line L1 (0, -1) -> (7.7, -1) projected
  line L2 (0, 0) -> (7.7, 0)
  line L3 (7.7, 0) -> (7.7, -1)
  line L4 (7.7, -1) -> (0, -1)
  line L5 (0, -1) -> (0, 0)
  point P0 (3.85, -6)
extrude "Extrusion41" cut sketch "Sketch47" against normal through all
sketch "Sketch48" plane through (12.422, 2.5, 3) normal (0, 0, 1) x (1, 0, 0)
  line L0 (1.1328, 2.5) -> (63.7322, 2.5) projected
  line L1 (1.1328, -1.5) -> (63.7322, -1.5) projected
  line L2 (63.7322, 2.5) -> (63.7322, -1.5)
  line L3 (63.7322, 2.5) -> (71.128, 2.5) projected
  line L4 (71.128, 2.5) -> (63.7322, -1.5)
  line L5 (63.7322, 2.5) -> (71.128, -1.5)
  line L6 (71.128, -1.5) -> (71.128, 2.5) projected
  circle A0 centre (67.4301, 0.5) radius 4.2041
  line L7 (67.4301, 0.5) -> (67.4301, -1.5)
  line L8 (64.278, -1.5) -> (70.278, -1.5) projected
  line L9 (70.278, 2.5) -> (70.278, -1.5) projected
  line L10 (71.128, 0.6263) -> (70.278, 0.6263)
  line L11 (63.7322, 0.5) -> (64.5822, 0.5)
  line L12 (64.5822, 2.5) -> (64.5822, -1.5)
  line L13 (70.278, 2.5) -> (70.278, -1.5)
  line L14 (64.5822, 2.5) -> (70.278, -1.5)
  line L15 (70.278, 2.5) -> (64.5822, -1.5)
  circle A1 centre (67.4301, 0.5) radius 3.48
  line L16 (63.7322, 2.5) -> (71.128, 2.5)
  point P0 (-12.422, -2.5)
  dimension "d110" = 4
  dimension "d111" = 0.85
extrude "Extrusion42" add sketch "Sketch48" against normal blind 6 contours A0 L3 A1
sketch "Sketch49" plane through (12.422, 2.5, 3) normal (0, 0, 1) x (1, 0, 0)
  line L0 (71.128, 2.5) -> (61.853, 2.5)
  line L1 (61.853, 2.5) -> (61.853, 6.3445)
  line L2 (61.853, 6.3445) -> (71.128, 6.3445)
  line L3 (71.128, 6.3445) -> (71.128, 2.5)
  point P0 (-12.422, -2.5)
extrude "Extrusion43" cut sketch "Sketch49" against normal through all
sketch "Sketch50" plane through (79.7, 5, 0) normal (0, 1, 0) x (1, 0, 0)
  arc A0 (-3.5458, -1.5) -> (-3.5458, 1.5) centre (0, 0) ccw projected
  line L0 (0, -3.85) -> (3.85, -3.85)
  circle A1 centre (0, 0) radius 3.85
  line L1 (0, 3.85) -> (-3.85, 3.85)
  line L2 (-3.85, 3.85) -> (3.85, 3.85)
  line L3 (3.85, 3.85) -> (3.85, -3.85)
  line L4 (3.85, -3.85) -> (-3.85, -3.85)
  line L5 (-3.85, -3.85) -> (-3.85, 3.85)
  circle A2 centre (-69.691, 0) radius 3 projected
  arc A3 (-66.1452, 1.5) -> (-66.1452, -1.5) centre (-69.691, 0) ccw projected
  circle A4 centre (-69.691, 0) radius 3.85
  line L6 (-69.691, 3.85) -> (-73.541, 3.85)
  line L7 (-73.541, 3.85) -> (-65.841, 3.85)
  line L8 (-65.841, 3.85) -> (-65.841, -3.85)
  line L9 (-65.841, -3.85) -> (-73.541, -3.85)
  line L10 (-73.541, -3.85) -> (-73.541, 3.85)
  point P0 (-79.7, 0)
  point P1 (-3.85, 0)
  point P2 (-3.5458, -1.5)
  point P3 (-3.5458, 1.5)
  point P4 (-69.691, -3.85)
  point P5 (-65.841, 0)
  point P6 (-66.1452, -1.5)
extrude "Extrusion44" cut sketch "Sketch50" against normal blind 10 contours A0 L4 L5 A1
extrude "Extrusion45" cut sketch "Sketch50" against normal blind 10 contours L5 L1 A0 A1
extrude "Extrusion46" cut sketch "Sketch50" against normal blind 10 contours A1 A0
extrude "Extrusion47" cut sketch "Sketch50" against normal blind 10 contours L8 L9 A3 A4
extrude "Extrusion48" cut sketch "Sketch50" against normal blind 10 contours A3 L7 L8 A4
extrude "Extrusion49" cut sketch "Sketch50" against normal blind 10 contours A4 A3
sketch "Sketch51" plane through (75.85, 5, 1.5) normal (1, 0, 0) x (0, 0, -1)
  line L0 (-1.5, 0) -> (4.5, 0)
  line L1 (4.5, 0) -> (4.5, -5)
  line L2 (4.5, -5) -> (-1.5, -5)
  line L3 (-1.5, -5) -> (-1.5, 0)
  line L4 (-1.5, 0) -> (4.5, 0)
  line L5 (4.5, 0) -> (4.5, 1)
  line L6 (4.5, 1) -> (-1.5, 1)
  line L7 (-1.5, 1) -> (-1.5, 0)
  point P0 (1.5, -5)
  point P1 (4.5, 0)
  dimension "d128" = 5
  dimension "d129" = 1
extrude "Extrusion50" add sketch "Sketch51" along normal blind 5 contours L0 L1 L2 L3
extrude "Extrusion51" add sketch "Sketch51" along normal blind 5 contours L7 L6 L5 L0
sketch "Sketch52" plane through (13.859, 5, -1.5) normal (-1, 0, 0) x (0, 0, 1)
  line L0 (-1.5, -5) -> (-1.5, 1) projected
  line L1 (4.5, -5) -> (-1.5, -5) projected
  line L2 (-1.5, 1) -> (4.5, 1)
  line L3 (4.5, 1) -> (4.5, -5)
  line L4 (4.5, -5) -> (-1.5, -5)
  line L5 (-1.5, -5) -> (-1.5, 1)
  point P0 (1.5, -5)
extrude "Extrusion52" add sketch "Sketch52" along normal blind 5
sketch "Sketch53" plane through (13.859, 5, -1.5) normal (1, 0, 0) x (0, 0, -1)
  line L0 (-4.5, 1) -> (-4.5, -1.5) projected
  line L1 (1.5, -5) -> (1.5, -2.5) projected
  line L2 (-4.5, 1) -> (1.5, 1)
  line L3 (1.5, 1) -> (1.5, -5)
  line L4 (1.5, -5) -> (-4.5, -5)
  line L5 (-4.5, -5) -> (-4.5, 1)
  point P0 (-1.5, -5)
extrude "Extrusion53" add sketch "Sketch53" along normal blind 2
sketch "Sketch54" plane through (75.85, 5, 1.5) normal (-1, 0, 0) x (0, 0, 1)
  line L0 (-4.5, -5) -> (1.5, -5) projected
  line L1 (1.5, 1) -> (-4.5, 1) projected
  line L2 (-4.5, -5) -> (1.5, -5)
  line L3 (1.5, -5) -> (1.5, 1)
  line L4 (1.5, 1) -> (-4.5, 1)
  line L5 (-4.5, 1) -> (-4.5, -5)
  point P0 (-1.5, -5)
extrude "Extrusion54" add sketch "Sketch54" along normal blind 2
sketch "Sketch55" plane through (80.85, 5, 1.5) normal (1, 0, 0) x (0, 0, -1)
  circle A0 centre (1.5, -2) radius 1.95
  point P0 (1.5, -5)
  dimension "d140" = 3.9
extrude "Extrusion55" cut sketch "Sketch55" against normal blind 6
sketch "Sketch56" plane through (8.859, 5, -1.5) normal (-1, 0, 0) x (0, 0, 1)
  circle A0 centre (1.5, -2) radius 1.95
  point P0 (1.5, -5)
  dimension "d143" = 3.9
extrude "Extrusion56" cut sketch "Sketch56" against normal blind 6
fillet "Fillet5" radius 2 4 edges at (12.359, 6, 3) (12.359, 0, 3) (12.359, 6, -3) (12.359, 0, -3)
fillet "Fillet6" radius 2 4 edges at (77.35, 6, 3) (77.35, 6, -3) (77.35, 0, -3) (77.35, 0, 3)
properties part number "Part3_3DPrint"
